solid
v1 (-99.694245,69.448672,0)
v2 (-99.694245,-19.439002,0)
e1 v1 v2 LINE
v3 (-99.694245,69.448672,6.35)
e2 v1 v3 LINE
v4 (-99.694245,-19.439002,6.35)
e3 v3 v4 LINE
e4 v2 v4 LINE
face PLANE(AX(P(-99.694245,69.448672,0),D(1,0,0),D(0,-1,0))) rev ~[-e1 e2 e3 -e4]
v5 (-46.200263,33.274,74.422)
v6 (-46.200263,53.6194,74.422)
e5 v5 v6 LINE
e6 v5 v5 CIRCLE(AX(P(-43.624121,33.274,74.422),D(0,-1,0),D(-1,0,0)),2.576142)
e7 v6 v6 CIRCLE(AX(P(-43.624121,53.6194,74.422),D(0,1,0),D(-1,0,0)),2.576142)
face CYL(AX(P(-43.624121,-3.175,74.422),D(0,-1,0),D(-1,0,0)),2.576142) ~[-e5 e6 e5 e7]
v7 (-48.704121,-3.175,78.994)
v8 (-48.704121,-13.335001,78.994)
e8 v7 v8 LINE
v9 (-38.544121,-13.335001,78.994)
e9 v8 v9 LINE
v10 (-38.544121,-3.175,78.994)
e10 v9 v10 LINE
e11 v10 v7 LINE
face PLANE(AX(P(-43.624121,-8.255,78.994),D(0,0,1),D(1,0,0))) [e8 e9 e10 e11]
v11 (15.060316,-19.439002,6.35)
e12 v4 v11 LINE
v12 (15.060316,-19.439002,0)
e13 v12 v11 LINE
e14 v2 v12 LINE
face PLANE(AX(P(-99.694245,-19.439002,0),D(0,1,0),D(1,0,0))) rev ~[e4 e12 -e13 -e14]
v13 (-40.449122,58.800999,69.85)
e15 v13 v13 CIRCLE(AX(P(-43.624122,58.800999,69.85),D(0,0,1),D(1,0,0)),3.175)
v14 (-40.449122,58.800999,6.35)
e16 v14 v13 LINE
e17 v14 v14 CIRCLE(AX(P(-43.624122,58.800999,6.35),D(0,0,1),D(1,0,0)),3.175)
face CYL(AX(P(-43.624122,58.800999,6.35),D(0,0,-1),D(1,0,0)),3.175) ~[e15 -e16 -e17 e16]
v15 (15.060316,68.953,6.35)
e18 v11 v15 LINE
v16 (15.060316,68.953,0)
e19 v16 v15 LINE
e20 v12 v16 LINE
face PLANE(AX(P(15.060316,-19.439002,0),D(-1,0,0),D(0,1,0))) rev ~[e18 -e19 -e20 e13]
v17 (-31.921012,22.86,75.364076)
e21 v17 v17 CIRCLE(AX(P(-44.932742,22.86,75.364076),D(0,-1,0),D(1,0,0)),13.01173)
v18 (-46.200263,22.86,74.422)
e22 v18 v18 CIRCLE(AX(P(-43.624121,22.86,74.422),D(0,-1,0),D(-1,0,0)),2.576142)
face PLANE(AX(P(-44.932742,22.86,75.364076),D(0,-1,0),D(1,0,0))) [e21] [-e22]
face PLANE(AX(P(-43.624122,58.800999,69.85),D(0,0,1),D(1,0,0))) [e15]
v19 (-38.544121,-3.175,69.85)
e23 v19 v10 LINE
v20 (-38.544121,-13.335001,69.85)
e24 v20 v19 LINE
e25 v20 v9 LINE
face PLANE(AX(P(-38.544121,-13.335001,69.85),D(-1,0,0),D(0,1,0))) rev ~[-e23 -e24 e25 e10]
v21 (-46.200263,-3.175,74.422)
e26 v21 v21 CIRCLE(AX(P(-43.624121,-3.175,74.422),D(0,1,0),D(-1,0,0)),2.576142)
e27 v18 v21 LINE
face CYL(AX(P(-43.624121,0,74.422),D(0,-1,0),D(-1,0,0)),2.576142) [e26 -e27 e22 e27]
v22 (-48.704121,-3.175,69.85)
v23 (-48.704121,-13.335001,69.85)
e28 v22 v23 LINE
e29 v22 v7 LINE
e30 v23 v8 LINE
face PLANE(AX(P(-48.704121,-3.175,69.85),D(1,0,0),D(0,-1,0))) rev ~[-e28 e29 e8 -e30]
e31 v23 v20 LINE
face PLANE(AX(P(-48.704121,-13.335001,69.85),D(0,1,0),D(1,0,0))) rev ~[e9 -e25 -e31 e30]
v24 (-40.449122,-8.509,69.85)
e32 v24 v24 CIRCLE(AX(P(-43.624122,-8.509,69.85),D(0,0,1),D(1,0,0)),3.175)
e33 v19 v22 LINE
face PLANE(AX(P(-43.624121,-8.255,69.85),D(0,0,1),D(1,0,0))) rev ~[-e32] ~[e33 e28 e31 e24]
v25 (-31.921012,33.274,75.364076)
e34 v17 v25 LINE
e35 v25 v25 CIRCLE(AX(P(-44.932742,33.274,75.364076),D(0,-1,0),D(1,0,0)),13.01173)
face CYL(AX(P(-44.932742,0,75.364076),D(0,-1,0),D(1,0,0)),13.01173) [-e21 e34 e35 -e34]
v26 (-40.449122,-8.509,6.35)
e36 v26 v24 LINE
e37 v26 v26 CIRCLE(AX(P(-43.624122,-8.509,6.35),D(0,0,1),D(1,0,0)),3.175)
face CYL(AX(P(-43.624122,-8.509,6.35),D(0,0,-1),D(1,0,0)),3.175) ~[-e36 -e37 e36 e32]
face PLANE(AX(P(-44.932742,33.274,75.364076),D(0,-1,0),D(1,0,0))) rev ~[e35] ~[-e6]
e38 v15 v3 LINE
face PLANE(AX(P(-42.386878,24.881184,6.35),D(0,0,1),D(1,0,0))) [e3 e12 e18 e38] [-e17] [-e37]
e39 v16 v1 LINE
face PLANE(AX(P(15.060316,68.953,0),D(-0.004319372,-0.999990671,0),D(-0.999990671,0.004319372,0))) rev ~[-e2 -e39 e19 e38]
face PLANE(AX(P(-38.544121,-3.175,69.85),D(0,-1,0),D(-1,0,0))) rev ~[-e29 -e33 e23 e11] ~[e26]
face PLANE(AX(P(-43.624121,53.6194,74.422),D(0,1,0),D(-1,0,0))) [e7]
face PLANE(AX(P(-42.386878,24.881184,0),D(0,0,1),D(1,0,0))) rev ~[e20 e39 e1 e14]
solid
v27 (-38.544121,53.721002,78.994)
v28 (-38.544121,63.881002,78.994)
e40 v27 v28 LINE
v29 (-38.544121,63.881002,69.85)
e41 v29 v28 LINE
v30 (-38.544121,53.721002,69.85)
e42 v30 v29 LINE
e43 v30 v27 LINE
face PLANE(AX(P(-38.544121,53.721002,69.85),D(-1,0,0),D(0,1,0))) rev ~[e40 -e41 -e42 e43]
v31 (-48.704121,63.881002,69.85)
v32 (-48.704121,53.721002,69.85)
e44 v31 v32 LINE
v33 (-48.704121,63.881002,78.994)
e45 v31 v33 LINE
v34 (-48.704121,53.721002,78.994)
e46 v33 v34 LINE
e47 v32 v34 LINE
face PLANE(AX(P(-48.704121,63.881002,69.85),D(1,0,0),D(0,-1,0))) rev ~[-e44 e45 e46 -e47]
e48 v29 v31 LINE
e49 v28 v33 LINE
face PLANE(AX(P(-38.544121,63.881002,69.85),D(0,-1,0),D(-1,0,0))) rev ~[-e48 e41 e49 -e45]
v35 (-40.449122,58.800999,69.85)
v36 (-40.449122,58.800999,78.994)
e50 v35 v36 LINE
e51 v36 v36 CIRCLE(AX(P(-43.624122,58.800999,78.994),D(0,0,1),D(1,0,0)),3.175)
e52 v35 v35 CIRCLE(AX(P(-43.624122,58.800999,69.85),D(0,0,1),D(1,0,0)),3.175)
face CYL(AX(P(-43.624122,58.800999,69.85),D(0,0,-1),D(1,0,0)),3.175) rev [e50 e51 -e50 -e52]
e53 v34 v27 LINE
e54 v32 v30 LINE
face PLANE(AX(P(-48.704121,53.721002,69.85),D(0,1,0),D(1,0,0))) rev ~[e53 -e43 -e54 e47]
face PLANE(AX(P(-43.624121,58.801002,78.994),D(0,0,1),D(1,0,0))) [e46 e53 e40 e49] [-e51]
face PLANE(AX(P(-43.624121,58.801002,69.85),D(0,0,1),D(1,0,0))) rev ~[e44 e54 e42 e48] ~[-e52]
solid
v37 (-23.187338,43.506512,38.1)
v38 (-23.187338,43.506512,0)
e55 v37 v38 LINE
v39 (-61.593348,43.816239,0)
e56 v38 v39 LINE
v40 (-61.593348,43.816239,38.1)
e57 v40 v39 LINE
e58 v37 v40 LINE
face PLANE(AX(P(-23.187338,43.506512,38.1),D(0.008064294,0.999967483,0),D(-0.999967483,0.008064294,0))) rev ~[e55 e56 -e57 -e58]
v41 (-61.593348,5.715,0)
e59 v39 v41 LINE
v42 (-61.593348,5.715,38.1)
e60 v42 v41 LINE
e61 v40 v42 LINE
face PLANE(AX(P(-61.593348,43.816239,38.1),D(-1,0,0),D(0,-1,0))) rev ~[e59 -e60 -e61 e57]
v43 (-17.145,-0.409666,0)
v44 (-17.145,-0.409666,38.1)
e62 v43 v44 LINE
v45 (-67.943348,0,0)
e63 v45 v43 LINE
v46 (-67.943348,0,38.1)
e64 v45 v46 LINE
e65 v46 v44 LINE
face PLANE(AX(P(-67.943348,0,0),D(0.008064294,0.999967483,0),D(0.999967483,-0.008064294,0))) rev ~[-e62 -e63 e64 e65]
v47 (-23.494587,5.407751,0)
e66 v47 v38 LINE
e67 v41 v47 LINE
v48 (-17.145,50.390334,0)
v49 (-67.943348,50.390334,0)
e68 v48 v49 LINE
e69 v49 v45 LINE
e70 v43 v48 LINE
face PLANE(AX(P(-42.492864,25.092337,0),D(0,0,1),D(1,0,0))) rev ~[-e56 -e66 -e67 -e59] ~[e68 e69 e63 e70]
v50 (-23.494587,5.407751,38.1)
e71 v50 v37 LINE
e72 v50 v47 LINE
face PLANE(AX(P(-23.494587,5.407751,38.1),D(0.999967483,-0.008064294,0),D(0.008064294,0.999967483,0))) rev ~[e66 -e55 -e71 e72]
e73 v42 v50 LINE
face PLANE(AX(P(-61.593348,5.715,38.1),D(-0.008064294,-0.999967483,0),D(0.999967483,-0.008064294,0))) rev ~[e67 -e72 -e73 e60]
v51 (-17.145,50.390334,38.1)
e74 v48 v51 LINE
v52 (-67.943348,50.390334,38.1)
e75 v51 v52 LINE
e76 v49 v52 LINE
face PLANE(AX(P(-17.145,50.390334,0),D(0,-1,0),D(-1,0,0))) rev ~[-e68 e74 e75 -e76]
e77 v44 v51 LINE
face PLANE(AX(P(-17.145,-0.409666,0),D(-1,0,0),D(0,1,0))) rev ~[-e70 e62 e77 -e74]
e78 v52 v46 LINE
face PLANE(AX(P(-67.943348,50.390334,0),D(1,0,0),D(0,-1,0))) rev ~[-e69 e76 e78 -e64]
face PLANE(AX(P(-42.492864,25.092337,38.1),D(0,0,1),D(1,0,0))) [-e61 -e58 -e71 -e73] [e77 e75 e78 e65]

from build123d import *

# Parameters (mm, degrees)
F1_DEPTH  = 38.1
F3_DEPTH  = 6.35
F5_DEPTH  = 111.76
F6_R      = 3.175
F7_DEPTH  = 63.5
F8_R      = 3.175
F9_DEPTH  = 9.144
F10_R     = 2.5761417158
F11_DEPTH = 56.7944
F12_R     = 13.0117300102
F13_DEPTH = 33.274
F14_DEPTH = 22.86


with BuildPart() as f1:
    # F0 (on Top) → F1 (new body)
    with BuildSketch(Plane.XY):
        Polygon((-17.1450002551, 50.390333843), (-42.5450002551, 50.390333843), (-67.943348394, 50.390333843), (-67.943348394, 0), (-17.1450002551, -0.409666157), align=None)
    extrude(amount=F1_DEPTH)

    # F4 (on face) → F5 (cut)
    with BuildSketch(Plane.XY.offset(38.1)):
        Polygon((-61.593348394, 43.8162393793), (-61.593348394, 5.7150004432), (-23.4945872898, 5.4077508254), (-23.1873376721, 43.5065119296), align=None)
    extrude(amount=-F5_DEPTH, mode=Mode.SUBTRACT)


with BuildPart() as f3:
    # F2 (on Top) → F3 (new body)
    with BuildSketch(Plane.XY):
        Polygon((15.0603158399, 68.9530000091), (-99.6942445636, 69.448672235), (-99.6942445636, -19.439002499), (15.0603158399, -19.439002499), align=None)
    extrude(amount=F3_DEPTH)

    # F6 (on face) → F7 (join)
    with BuildSketch(Plane.XY.offset(6.35)):
        with Locations((-43.6241216958, 58.8009990752)):
            Circle(F6_R)
        with Locations((-43.6241216958, -8.508999832)):
            Circle(F6_R)
    extrude(amount=F7_DEPTH)

    # F8 (on face) → F9, piece 2 (join)
    with BuildSketch(Plane.XY.offset(69.85)):
        Polygon((-48.7041212618, -3.1750001945), (-48.7041212618, -7.4930000119), (-48.7041212618, -13.3350007236), (-38.5441212618, -13.3350007236), (-38.5441212618, -3.1750001945), align=None)
    extrude(amount=F9_DEPTH)

    # F10 (on face) → F11 (join)
    with BuildSketch(Plane(origin=(0, -3.1750001945, 0), x_dir=(-1, 0, 0), z_dir=(0, 1, 0))):
        with Locations((43.6241212618, 74.422)):
            Circle(F10_R)
    extrude(amount=F11_DEPTH)

    # F12 (on Front) → F13 (join)
    with BuildSketch(Plane.XZ):
        with Locations((-44.9327416718, 75.3640756011)):
            Circle(F12_R)
    extrude(amount=-F13_DEPTH)

    # F14 (cut): a face of the model
    f14_faces = [f3.faces().sort_by_distance(p)[0] for p in [
        (-57.576444381, 0, 75.3640756011),
    ]]
    extrude(f14_faces, amount=-F14_DEPTH, mode=Mode.SUBTRACT)


with BuildPart() as f9:
    # F8 (on face) → F9 (new body)
    with BuildSketch(Plane.XY.offset(69.85)):
        Polygon((-48.7041212618, 63.8810023665), (-48.7041212618, 59.8170012236), (-48.7041212618, 53.7210023665), (-38.5441212618, 53.7210023665), (-38.5441212618, 63.8810023665), align=None)
        with Locations((-43.6241216958, 58.8009990752)):
            Circle(F8_R, mode=Mode.SUBTRACT)
    extrude(amount=F9_DEPTH)


solid = Compound([f1.part, f3.part, f9.part])
